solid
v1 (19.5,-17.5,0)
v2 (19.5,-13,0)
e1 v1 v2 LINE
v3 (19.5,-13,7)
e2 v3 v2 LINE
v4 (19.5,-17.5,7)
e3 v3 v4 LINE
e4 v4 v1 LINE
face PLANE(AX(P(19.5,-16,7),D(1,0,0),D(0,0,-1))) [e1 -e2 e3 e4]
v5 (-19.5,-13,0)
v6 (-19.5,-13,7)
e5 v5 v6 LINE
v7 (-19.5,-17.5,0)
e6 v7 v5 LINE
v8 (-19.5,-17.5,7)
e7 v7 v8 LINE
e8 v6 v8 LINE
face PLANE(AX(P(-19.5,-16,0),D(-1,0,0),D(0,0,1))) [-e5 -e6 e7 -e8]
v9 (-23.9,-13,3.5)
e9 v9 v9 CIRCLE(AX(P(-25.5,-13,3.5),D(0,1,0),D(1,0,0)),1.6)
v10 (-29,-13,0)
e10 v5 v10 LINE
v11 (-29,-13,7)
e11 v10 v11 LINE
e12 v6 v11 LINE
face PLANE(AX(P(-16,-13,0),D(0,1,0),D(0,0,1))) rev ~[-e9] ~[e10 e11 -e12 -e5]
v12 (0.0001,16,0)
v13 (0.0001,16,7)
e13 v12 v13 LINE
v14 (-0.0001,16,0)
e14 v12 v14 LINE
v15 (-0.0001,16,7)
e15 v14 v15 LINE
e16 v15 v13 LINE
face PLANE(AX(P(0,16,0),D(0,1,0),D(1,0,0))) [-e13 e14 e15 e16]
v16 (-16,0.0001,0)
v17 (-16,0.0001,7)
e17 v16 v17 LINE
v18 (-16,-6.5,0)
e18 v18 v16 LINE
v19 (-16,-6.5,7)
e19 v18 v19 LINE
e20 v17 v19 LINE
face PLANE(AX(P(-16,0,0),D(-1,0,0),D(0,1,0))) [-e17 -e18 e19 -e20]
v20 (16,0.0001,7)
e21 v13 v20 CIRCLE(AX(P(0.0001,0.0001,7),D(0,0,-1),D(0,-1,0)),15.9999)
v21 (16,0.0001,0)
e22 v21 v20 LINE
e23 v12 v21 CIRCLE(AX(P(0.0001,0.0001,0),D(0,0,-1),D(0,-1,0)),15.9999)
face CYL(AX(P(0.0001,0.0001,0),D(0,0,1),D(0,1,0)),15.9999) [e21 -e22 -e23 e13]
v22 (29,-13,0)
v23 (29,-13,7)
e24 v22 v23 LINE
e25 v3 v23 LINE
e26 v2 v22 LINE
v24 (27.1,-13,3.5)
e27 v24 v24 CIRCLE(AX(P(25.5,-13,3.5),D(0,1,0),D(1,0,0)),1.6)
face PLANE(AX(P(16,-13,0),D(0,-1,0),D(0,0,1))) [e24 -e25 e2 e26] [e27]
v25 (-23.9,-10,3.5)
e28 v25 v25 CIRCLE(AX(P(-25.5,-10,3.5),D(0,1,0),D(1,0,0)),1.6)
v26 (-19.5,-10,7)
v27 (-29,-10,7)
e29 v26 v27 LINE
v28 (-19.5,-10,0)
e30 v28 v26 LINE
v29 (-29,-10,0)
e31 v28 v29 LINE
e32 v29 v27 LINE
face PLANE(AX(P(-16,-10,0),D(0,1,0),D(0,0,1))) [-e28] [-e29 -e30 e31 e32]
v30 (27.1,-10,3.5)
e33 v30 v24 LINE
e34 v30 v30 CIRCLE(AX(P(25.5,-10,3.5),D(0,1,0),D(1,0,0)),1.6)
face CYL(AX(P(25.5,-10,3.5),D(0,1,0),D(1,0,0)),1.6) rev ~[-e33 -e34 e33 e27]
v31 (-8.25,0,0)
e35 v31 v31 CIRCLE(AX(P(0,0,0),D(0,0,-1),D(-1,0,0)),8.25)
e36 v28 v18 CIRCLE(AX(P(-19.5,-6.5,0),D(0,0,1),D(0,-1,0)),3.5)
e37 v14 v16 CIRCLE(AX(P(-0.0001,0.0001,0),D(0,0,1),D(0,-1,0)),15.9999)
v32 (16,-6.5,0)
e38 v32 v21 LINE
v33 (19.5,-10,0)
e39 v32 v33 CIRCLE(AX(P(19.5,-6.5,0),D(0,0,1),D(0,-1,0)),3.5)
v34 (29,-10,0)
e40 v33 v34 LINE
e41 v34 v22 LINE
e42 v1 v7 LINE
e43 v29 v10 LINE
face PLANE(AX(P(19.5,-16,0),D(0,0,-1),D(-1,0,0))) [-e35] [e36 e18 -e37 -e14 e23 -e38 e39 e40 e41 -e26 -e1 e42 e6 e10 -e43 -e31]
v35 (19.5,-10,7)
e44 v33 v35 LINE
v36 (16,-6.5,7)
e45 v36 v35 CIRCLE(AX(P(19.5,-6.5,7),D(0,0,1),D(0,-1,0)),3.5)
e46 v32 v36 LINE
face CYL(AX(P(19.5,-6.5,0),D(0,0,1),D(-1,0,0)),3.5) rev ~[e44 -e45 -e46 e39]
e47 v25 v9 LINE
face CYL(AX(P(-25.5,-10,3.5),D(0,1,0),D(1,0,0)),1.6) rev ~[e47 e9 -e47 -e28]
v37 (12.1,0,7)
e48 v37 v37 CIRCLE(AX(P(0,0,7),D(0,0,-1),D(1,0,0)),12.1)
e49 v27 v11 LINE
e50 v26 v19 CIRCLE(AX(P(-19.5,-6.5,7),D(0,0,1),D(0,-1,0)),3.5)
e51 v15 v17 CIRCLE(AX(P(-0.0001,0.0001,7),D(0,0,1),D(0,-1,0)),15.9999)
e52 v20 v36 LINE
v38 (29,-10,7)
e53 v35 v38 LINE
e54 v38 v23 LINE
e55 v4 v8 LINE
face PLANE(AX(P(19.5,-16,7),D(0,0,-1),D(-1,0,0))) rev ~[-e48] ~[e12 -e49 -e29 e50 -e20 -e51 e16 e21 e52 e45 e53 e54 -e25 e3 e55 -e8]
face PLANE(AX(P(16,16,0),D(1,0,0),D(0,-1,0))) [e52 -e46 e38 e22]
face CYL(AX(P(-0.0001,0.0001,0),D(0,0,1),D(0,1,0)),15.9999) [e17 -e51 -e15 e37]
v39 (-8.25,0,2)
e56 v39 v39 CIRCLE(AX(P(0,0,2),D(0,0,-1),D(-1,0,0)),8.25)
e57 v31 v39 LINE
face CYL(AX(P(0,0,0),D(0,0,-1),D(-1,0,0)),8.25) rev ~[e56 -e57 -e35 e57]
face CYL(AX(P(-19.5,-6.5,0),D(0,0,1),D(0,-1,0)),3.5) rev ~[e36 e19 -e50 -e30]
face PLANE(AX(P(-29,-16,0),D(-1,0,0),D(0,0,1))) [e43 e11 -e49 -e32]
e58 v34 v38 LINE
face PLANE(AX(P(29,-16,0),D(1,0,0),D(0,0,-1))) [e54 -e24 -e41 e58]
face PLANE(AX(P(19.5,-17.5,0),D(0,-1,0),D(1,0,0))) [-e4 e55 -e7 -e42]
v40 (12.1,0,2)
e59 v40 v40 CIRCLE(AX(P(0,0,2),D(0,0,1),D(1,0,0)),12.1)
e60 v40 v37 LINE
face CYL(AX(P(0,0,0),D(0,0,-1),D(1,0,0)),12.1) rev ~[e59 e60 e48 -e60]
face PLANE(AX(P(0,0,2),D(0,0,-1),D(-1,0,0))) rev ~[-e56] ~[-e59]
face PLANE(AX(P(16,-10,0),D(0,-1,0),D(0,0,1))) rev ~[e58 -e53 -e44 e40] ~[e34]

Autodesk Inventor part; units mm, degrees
ref_plane "YZ Plane" through (0, 0, 0) normal (1, 0, 0) x (0, 1, 0)
ref_plane "XZ Plane" through (0, 0, 0) normal (0, 1, 0) x (-1, 0, 0)
ref_plane "XY Plane" through (0, 0, 0) normal (0, 0, 1) x (1, 0, 0)
sketch "Skizze1" plane through (0, 0, 0) normal (0, 0, 1) x (1, 0, 0)
  line L0 (0, 22.4) -> (0, -22.4) projected
  line L1 (-22.4, 0) -> (22.4, 0) projected
  line L2 (-16, 16) -> (16, 16)
  line L3 (16, 16) -> (16, -16)
  line L4 (16, -16) -> (-16, -16)
  line L5 (-16, -16) -> (-16, 16)
  circle A0 centre (0, 0) radius 12.1
  dimension "d0" = 32
  dimension "d1" = 32
  dimension "d2" = 24.2
extrude "Extrusion1" add sketch "Skizze1" along normal blind 7 contours L2 L3 L1 A0 L0 | L0 A0 L1 L5 L2 | L1 L3 L4 L0 A0 | A0 L0 L4 L5 L1
sketch "Skizze2" plane through (16, -16, 0) normal (1, 0, 0) x (0, 0, -1)
  line L0 (-7, 32) -> (-7, 0) projected
  line L1 (0, 32) -> (0, 0) projected
  line L2 (-7, 0) -> (0, 0)
  line L3 (0, 0) -> (0, 6)
  line L4 (0, 6) -> (-7, 6)
  line L5 (-7, 6) -> (-7, 0)
  line L6 (0, 3) -> (-7, 3)
  point P0 (0, 16)
  point P1 (-7, 6)
  point P2 (0, 3)
  dimension "d5" = 6
sketch "Skizze3" plane through (-16, -16, 0) normal (-1, 0, 0) x (0, 0, 1)
  line L0 (7, 32) -> (7, 0) projected
  line L1 (0, 32) -> (0, 0) projected
  line L2 (7, 0) -> (0, 0)
  line L3 (0, 0) -> (0, 6)
  line L4 (0, 6) -> (7, 6)
  line L5 (7, 6) -> (7, 0)
  line L6 (0, 3) -> (7, 3)
  point P0 (0, 16)
  point P1 (7, 6)
  point P2 (0, 3)
  point P3 (7, 3)
  dimension "d6" = 6
sketch "Skizze4" plane through (0, 0, 0) normal (0, 0, -1) x (-1, 0, 0)
  circle A0 centre (0, 0) radius 12.1
  circle A1 centre (0, 0) radius 12.1 projected
  circle A2 centre (0, 0) radius 8.25
  dimension "d11" = 24.2
  dimension "d12" = 16.5
extrude "Extrusion4" add sketch "Skizze4" against normal blind 2
fillet "Rundung1" radius 16 2 edges at (16, 16, 3.5) (-16, 16, 3.5)
extrude "Extrusion6" add sketch "Skizze3" along normal blind 13 contours L0 L6 L1 L4
extrude "Extrusion7" add sketch "Skizze2" along normal blind 13 contours L4 L1 L6 L0
sketch "Skizze6" plane through (16, -10, 7) normal (0, 1, 0) x (1, 0, 0)
  circle A0 centre (9.5, 3.5) radius 1.6
  line L0 (0, 7) -> (13, 7) projected
  line L1 (13, 7) -> (13, 0) projected
  circle A1 centre (-41.5, 3.5) radius 1.6
  line L2 (-45, 0) -> (-45, 7) projected
  line L3 (-32, 7) -> (-45, 7) projected
  point P0 (-16, 7)
  dimension "d29" = 3.2
  dimension "d30" = 3.5
  dimension "d31" = 3.5
  dimension "d32" = 3.2
  dimension "d33" = 3.5
  dimension "d34" = 3.5
extrude "Extrusion8" cut sketch "Skizze6" against normal up to surface (3 mm away)
sketch "Skizze7" plane through (16, -16, 7) normal (1, 0, 0) x (0, 0, -1)
  line L0 (7, 0) -> (0, 0) projected
  line L1 (0, 3) -> (0, 0) projected
  line L2 (7, 0) -> (0, 0)
  line L3 (0, 0) -> (0, 3)
  line L4 (0, 3) -> (7, 3)
  line L5 (7, 3) -> (7, 0)
  point P0 (7, 16)
extrude "Extrusion9" add sketch "Skizze7" along normal blind 3.5
sketch "Skizze8" plane through (-16, -16, 0) normal (-1, 0, 0) x (0, 0, 1)
  line L0 (0, 0) -> (7, 0) projected
  line L1 (0, 0) -> (0, 3) projected
  line L2 (7, 0) -> (0, 0)
  line L3 (0, 0) -> (0, 3)
  line L4 (0, 3) -> (7, 3)
  line L5 (7, 3) -> (7, 0)
  point P0 (0, 16)
extrude "Extrusion10" add sketch "Skizze8" along normal blind 3.5
fillet "Rundung3" radius 3.5 2 edges at (16, -10, 3.5) (-16, -10, 3.5)
sketch "Skizze9" plane through (19.5, -16, 0) normal (0, -1, 0) x (1, 0, 0)
  line L0 (0, 7) -> (-39, 7) projected
  line L1 (0, 0) -> (9.5, 0) projected
  line L2 (-39, 7) -> (0, 7)
  line L3 (0, 7) -> (0, 0)
  line L4 (0, 0) -> (-39, 0)
  line L5 (-39, 0) -> (-39, 7)
  point P0 (-19.5, 0)
extrude "Extrusion11" add sketch "Skizze9" along normal blind 1.5
properties part number "_3D-Druck"
